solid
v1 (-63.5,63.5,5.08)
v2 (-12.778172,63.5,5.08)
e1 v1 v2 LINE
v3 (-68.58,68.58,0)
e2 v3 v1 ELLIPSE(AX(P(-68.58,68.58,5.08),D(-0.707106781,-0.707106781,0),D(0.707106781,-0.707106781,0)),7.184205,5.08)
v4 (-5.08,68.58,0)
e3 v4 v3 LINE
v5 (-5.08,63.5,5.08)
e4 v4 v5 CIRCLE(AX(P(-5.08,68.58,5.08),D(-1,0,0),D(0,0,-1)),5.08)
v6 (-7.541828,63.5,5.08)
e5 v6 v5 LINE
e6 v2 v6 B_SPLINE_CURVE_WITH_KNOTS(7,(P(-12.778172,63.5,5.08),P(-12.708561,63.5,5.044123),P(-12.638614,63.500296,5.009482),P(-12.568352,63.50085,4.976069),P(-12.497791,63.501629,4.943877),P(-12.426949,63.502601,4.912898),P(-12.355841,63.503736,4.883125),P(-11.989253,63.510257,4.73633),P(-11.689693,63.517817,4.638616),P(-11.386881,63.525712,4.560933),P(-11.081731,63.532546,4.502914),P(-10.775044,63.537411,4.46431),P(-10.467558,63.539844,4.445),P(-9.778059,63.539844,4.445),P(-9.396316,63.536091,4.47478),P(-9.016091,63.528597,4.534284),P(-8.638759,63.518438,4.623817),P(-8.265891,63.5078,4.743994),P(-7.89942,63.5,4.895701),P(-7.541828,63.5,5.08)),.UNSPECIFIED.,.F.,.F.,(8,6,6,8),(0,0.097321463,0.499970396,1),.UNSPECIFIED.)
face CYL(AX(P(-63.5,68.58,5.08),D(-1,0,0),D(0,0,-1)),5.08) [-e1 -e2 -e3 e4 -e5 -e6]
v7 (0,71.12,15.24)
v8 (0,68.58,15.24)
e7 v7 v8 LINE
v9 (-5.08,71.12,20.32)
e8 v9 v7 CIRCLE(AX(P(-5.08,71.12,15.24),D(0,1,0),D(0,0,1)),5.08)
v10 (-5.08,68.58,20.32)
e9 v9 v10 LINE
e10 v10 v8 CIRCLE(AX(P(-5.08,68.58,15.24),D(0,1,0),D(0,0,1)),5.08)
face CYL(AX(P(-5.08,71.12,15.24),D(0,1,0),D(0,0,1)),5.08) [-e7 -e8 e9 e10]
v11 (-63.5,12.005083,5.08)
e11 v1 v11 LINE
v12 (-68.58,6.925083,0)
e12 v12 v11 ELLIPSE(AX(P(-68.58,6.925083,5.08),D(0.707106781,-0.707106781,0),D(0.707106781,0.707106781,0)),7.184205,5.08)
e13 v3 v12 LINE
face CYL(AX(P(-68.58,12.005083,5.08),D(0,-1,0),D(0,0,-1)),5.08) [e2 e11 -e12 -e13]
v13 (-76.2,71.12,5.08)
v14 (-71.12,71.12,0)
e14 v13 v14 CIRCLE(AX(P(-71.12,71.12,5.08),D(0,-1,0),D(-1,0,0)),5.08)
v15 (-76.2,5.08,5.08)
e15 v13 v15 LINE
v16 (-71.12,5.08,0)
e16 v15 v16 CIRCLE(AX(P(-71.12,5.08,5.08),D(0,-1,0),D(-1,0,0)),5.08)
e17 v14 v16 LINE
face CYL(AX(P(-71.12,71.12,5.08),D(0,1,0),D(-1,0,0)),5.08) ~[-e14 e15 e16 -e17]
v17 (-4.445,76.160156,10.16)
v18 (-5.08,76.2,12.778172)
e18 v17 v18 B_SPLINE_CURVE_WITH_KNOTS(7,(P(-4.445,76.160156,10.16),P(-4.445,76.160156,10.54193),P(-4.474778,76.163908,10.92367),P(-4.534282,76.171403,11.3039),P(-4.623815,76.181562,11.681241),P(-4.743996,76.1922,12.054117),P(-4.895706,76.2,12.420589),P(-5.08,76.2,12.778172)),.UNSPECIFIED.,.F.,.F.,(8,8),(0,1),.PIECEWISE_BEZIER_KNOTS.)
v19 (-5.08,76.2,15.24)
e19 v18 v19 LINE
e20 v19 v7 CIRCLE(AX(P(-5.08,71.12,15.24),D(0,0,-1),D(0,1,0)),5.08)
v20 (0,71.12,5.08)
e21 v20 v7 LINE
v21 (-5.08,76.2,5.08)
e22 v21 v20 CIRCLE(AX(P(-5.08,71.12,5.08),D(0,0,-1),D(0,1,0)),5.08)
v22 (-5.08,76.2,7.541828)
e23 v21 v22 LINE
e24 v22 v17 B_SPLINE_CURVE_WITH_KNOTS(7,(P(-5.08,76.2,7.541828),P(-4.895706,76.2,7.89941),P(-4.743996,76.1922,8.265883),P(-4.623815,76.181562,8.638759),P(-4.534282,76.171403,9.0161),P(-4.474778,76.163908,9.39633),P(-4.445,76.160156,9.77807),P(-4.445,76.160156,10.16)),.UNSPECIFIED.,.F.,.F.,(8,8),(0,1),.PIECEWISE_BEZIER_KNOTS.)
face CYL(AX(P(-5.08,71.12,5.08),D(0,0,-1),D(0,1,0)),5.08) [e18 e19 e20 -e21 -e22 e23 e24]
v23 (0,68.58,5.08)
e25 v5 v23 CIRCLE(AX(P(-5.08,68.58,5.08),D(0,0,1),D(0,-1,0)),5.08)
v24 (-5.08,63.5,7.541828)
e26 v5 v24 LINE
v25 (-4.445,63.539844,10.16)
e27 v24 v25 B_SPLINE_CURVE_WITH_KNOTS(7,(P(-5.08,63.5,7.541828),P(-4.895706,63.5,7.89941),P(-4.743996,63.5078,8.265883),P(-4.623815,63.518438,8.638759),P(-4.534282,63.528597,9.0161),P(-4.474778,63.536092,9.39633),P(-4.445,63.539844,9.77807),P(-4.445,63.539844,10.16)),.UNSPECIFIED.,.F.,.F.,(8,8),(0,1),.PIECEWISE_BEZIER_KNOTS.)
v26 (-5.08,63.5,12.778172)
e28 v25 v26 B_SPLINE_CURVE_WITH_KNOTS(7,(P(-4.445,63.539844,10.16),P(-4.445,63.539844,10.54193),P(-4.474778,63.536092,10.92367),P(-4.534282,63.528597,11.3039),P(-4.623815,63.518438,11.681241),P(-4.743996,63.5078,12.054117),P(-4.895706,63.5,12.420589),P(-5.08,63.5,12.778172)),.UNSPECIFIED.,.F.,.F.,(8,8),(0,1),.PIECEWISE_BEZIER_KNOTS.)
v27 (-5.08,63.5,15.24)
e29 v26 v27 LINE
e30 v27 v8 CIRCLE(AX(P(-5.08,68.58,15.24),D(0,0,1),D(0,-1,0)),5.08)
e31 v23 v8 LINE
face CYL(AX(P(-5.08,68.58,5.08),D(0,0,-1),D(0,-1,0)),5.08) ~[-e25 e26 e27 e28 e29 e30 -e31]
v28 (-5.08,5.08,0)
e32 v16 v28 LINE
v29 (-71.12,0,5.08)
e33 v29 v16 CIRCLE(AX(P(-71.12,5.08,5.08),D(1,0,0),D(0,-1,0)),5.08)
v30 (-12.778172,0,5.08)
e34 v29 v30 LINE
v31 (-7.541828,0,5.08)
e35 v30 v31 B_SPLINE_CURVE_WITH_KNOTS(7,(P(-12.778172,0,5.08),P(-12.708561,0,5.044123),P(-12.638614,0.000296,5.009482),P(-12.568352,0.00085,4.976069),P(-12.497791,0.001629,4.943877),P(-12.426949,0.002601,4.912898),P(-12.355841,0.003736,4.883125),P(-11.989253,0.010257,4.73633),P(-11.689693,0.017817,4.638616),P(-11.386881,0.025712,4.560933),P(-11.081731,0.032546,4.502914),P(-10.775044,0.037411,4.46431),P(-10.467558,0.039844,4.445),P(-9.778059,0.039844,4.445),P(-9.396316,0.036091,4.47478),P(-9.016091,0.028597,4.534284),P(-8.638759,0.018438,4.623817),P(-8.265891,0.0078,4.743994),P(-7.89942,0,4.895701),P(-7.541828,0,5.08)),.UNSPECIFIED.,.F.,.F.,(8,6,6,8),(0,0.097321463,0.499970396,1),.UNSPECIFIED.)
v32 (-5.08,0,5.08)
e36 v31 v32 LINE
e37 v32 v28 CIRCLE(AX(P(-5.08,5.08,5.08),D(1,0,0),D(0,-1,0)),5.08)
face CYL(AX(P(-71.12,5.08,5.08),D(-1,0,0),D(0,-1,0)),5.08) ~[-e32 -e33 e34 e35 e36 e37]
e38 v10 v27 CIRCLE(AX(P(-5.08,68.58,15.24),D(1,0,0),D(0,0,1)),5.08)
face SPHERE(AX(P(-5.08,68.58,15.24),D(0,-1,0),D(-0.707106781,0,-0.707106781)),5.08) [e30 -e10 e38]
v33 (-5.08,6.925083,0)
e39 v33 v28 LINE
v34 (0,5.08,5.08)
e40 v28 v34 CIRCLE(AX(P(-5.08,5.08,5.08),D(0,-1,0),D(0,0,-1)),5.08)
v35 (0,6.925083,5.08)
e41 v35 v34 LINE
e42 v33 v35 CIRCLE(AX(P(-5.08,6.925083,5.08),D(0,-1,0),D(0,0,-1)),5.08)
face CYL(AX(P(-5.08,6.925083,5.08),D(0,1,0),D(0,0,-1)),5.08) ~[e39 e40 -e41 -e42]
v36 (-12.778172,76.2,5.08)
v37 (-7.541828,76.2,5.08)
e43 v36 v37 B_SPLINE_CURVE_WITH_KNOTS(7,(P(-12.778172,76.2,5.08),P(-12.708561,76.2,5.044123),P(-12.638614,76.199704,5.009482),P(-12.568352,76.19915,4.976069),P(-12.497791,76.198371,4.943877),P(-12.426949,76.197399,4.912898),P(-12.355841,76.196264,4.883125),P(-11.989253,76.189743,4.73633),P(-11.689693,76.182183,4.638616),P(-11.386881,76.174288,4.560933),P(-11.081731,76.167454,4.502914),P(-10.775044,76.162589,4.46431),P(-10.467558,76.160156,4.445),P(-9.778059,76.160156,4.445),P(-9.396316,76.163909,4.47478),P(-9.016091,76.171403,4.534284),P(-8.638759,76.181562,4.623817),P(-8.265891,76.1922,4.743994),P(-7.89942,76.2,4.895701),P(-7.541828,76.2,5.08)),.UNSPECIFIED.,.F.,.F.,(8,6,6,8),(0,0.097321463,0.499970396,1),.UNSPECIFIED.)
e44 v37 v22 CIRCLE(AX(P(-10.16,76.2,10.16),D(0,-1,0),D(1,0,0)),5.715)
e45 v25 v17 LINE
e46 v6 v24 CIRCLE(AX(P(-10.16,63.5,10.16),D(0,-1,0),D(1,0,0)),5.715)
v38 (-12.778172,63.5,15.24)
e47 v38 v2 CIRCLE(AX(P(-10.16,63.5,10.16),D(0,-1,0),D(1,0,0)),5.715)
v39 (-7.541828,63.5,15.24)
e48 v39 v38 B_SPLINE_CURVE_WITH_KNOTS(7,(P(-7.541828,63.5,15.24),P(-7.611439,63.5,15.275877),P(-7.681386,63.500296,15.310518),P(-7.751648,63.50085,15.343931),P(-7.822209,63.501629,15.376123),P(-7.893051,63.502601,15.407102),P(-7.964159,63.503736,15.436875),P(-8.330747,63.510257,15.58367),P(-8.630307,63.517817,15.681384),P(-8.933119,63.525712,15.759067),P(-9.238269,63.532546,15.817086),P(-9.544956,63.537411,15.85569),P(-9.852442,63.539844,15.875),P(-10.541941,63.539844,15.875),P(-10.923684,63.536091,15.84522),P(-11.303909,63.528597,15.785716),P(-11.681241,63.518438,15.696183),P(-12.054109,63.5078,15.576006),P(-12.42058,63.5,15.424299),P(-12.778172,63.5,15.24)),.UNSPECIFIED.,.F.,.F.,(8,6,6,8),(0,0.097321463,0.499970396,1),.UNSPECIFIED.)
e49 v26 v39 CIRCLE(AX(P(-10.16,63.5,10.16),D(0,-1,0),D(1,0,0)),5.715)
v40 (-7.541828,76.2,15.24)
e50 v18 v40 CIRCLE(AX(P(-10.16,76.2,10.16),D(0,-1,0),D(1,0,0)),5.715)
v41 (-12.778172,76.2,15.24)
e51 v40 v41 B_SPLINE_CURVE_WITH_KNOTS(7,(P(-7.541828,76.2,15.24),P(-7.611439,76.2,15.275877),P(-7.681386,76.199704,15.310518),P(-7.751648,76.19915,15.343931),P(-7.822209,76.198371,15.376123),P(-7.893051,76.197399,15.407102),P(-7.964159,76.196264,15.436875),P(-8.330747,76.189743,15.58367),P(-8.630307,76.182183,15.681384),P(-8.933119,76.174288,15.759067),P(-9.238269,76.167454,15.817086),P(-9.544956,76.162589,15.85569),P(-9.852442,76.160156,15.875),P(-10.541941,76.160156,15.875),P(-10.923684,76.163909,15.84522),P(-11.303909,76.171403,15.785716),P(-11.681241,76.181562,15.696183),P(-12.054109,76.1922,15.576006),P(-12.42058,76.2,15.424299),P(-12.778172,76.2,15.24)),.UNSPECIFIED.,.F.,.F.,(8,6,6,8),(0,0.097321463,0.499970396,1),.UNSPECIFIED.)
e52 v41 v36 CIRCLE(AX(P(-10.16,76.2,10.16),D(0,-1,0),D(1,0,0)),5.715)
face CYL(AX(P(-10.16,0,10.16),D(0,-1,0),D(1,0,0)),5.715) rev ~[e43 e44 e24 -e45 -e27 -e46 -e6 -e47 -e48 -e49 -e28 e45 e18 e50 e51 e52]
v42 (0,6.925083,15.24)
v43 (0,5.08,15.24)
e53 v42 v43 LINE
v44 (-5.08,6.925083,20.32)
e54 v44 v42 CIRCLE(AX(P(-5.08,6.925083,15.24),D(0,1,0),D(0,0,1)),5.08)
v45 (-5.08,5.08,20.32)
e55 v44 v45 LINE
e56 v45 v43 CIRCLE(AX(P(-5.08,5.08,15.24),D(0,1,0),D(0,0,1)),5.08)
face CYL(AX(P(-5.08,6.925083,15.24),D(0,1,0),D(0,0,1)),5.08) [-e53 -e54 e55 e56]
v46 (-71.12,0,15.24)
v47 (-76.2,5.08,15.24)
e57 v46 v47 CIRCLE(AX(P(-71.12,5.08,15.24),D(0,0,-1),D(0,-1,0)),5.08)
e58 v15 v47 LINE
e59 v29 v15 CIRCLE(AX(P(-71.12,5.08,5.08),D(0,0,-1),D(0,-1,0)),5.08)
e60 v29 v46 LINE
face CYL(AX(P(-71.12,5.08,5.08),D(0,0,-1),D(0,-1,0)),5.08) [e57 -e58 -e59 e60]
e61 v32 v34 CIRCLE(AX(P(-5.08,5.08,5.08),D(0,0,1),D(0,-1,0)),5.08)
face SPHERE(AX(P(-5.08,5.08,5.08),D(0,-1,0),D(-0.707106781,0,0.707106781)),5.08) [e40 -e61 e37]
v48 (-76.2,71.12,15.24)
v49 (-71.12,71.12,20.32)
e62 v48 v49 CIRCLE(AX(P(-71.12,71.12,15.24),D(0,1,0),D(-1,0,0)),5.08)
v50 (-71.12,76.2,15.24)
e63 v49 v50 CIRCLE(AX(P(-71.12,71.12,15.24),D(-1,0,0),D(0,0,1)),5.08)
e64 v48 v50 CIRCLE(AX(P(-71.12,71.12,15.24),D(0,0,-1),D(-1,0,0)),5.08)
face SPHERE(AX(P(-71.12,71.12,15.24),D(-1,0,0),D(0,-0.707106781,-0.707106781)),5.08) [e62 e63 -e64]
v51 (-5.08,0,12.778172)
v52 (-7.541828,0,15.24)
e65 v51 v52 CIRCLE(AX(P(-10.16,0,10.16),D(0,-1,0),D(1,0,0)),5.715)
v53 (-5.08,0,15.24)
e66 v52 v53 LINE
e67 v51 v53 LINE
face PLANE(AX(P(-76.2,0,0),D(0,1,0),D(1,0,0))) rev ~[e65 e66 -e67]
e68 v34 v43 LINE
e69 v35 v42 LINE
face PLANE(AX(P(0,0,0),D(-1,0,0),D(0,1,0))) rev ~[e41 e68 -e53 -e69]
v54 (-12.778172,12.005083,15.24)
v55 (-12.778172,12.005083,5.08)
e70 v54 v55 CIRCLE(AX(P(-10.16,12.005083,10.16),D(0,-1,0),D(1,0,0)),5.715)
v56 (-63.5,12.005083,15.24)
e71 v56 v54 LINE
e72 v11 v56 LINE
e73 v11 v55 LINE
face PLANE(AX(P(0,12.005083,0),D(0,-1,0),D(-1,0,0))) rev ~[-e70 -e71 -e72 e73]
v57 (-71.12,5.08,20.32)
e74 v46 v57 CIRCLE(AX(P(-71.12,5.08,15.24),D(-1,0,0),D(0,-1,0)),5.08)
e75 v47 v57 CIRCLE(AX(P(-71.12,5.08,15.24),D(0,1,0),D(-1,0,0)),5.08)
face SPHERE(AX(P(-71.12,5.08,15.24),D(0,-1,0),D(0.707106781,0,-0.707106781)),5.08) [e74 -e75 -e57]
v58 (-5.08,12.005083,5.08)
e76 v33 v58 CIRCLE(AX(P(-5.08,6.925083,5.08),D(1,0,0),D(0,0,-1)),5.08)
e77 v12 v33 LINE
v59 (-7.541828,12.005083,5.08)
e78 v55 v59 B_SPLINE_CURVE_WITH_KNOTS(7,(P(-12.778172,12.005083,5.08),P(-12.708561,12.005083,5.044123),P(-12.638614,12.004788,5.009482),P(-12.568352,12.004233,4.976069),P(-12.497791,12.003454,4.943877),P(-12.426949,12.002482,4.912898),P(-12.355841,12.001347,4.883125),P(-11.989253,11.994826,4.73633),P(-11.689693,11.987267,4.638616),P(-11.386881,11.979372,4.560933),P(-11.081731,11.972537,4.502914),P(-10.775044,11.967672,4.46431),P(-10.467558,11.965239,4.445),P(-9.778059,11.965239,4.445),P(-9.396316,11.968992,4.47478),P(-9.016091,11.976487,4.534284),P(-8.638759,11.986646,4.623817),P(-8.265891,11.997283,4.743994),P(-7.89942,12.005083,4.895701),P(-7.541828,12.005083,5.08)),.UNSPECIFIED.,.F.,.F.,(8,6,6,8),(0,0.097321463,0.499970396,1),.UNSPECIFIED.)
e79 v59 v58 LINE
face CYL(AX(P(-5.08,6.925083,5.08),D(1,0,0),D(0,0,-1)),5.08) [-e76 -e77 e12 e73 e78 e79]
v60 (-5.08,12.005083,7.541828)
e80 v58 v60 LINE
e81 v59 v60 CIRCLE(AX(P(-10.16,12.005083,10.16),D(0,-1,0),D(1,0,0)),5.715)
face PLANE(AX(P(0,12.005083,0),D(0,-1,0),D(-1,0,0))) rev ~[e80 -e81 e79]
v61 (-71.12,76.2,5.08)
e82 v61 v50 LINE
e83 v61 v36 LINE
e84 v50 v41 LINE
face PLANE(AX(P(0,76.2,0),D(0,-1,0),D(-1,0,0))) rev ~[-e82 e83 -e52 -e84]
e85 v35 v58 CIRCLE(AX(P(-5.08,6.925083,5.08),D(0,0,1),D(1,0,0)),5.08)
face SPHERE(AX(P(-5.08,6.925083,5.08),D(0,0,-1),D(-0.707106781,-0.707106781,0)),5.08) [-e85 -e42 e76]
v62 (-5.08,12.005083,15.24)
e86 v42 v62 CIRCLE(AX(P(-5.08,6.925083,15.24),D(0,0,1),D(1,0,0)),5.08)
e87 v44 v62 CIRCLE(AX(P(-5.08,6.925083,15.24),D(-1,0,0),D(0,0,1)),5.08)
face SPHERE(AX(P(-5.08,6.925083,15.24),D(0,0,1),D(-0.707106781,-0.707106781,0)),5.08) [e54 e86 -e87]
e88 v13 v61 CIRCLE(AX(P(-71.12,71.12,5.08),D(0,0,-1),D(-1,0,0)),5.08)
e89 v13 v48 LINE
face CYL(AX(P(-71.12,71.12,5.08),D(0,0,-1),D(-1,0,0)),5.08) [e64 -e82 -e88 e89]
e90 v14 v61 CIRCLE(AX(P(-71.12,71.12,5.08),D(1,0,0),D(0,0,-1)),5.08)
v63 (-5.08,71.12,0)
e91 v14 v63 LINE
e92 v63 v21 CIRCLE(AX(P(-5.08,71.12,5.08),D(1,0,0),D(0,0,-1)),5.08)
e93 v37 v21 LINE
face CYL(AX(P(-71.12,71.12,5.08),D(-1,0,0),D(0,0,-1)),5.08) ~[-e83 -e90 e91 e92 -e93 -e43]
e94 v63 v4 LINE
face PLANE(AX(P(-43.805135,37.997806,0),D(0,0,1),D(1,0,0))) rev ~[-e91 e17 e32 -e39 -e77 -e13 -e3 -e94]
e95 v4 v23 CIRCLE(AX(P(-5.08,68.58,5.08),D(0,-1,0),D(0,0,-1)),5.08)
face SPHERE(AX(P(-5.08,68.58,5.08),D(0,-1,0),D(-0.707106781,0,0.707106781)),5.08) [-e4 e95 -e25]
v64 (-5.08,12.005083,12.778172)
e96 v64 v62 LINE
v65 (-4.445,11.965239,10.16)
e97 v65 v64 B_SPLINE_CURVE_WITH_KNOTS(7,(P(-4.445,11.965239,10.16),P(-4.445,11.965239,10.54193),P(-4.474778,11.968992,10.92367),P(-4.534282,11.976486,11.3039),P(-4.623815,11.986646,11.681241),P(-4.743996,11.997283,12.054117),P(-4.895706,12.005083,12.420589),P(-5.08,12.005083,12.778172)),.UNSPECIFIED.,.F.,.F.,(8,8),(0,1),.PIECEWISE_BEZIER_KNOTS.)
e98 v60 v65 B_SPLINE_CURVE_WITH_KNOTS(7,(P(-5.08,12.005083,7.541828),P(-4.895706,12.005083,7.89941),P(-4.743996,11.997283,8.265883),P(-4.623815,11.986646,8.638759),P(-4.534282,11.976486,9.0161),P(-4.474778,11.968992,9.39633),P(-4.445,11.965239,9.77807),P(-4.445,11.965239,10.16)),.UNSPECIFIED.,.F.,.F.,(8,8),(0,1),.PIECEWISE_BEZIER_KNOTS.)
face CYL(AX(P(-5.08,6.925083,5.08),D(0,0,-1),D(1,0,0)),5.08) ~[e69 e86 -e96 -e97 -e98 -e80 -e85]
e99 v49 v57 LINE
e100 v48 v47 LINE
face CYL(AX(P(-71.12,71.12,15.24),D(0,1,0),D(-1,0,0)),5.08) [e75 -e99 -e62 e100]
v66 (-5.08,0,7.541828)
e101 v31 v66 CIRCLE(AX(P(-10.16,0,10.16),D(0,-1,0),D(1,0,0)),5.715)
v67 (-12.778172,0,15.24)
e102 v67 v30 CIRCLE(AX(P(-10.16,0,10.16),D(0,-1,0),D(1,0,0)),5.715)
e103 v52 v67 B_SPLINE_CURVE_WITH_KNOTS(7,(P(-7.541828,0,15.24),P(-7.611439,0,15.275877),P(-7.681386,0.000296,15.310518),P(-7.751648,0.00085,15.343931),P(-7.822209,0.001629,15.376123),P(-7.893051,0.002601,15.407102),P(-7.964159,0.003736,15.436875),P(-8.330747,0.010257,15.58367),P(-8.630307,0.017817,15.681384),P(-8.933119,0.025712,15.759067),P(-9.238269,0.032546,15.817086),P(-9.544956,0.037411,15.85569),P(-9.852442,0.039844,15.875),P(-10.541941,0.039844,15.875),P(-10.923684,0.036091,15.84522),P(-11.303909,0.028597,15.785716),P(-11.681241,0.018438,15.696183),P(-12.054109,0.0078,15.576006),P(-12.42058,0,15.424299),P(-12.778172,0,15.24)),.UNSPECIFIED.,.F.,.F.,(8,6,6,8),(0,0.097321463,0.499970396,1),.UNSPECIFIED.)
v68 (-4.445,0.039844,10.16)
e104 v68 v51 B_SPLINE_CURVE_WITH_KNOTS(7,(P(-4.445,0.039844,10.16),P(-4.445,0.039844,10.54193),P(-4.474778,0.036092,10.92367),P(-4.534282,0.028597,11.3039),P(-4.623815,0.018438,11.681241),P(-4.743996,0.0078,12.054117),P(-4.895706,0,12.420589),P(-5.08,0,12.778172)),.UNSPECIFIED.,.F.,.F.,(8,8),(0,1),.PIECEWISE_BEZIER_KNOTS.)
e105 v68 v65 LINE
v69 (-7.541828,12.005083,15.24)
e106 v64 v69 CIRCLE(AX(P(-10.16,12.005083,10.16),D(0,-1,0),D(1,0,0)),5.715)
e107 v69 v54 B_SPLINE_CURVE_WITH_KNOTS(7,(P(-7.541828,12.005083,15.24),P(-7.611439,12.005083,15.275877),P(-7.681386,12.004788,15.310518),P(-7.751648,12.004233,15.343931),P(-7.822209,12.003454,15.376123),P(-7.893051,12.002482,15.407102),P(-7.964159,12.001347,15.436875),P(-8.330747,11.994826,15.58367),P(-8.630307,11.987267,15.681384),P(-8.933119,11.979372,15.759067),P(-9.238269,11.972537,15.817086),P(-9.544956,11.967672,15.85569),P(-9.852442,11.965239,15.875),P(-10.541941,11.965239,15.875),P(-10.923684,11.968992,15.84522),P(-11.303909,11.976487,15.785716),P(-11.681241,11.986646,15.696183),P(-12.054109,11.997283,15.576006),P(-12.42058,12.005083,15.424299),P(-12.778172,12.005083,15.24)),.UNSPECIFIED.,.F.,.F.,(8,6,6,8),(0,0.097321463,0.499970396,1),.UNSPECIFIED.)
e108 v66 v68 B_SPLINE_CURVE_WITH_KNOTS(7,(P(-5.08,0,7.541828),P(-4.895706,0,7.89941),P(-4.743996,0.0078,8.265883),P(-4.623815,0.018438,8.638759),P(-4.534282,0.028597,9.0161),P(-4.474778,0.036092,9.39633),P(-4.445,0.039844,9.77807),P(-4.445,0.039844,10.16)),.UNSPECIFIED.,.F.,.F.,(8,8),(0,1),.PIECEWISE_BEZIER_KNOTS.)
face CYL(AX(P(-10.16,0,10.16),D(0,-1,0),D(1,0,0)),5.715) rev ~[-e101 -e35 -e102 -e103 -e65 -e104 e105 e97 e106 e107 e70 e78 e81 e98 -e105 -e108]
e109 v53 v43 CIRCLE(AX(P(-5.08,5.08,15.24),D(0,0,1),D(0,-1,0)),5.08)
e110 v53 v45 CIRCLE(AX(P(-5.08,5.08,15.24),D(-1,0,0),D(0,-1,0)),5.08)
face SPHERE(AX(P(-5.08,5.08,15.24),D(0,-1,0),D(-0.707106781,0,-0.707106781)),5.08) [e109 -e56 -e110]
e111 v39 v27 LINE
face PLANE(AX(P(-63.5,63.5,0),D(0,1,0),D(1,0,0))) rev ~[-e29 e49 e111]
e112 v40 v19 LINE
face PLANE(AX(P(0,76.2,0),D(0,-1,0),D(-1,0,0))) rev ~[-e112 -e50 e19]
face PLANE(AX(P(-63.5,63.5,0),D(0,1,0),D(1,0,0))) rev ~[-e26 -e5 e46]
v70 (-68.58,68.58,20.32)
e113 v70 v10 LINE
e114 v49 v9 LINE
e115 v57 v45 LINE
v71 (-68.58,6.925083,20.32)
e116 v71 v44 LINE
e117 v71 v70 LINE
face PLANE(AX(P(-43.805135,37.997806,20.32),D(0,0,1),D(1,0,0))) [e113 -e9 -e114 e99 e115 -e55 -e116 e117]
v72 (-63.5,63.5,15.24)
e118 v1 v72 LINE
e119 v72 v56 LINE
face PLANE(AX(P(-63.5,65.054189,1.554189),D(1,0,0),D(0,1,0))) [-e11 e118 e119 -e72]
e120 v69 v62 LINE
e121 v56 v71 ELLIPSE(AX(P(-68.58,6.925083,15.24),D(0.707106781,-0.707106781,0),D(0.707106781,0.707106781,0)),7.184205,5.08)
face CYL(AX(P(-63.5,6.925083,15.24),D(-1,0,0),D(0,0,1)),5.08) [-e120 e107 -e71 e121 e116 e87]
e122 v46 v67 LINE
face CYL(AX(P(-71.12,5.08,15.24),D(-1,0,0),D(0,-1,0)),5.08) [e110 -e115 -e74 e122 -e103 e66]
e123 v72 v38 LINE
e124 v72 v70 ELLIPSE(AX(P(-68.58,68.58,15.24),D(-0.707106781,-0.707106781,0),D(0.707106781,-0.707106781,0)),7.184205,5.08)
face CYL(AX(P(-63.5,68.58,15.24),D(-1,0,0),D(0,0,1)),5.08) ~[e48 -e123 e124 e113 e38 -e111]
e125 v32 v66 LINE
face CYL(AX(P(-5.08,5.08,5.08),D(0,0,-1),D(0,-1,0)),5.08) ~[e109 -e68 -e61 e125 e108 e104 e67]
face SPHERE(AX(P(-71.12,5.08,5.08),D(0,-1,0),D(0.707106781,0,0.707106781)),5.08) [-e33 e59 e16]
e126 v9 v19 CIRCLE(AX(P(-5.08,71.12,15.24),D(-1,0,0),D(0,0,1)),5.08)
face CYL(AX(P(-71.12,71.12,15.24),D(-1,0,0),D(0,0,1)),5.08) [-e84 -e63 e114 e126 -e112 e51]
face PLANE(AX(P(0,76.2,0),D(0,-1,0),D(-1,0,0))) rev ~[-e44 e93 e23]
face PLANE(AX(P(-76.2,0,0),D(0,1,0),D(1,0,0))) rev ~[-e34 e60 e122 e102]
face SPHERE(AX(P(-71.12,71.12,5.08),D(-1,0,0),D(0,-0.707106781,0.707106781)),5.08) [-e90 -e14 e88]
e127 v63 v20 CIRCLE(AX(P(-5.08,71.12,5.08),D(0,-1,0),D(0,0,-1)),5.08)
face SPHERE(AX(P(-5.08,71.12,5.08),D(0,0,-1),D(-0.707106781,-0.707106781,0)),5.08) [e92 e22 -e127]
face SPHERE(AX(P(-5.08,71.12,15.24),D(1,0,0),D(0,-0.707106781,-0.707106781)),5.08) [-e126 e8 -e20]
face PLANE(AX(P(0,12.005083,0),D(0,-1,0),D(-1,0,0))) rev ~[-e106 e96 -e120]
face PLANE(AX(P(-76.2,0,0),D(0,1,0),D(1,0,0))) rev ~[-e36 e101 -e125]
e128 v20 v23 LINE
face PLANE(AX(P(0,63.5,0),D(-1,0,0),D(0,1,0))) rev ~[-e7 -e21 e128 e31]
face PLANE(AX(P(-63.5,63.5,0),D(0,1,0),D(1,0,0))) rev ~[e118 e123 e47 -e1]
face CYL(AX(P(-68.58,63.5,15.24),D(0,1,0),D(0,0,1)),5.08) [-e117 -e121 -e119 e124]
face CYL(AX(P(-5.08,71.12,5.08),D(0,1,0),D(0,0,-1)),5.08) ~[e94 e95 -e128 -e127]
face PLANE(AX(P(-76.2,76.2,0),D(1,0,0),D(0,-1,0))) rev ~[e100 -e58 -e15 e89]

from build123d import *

# Parameters (mm, degrees)
F1_DEPTH      = 20.32
F2_R          = 5.715
F3_DEPTH      = 863.6
F4_T1_DEPTH   = 66.04
F4_T3_DEPTH   = 58.42
F4_T5_DEPTH   = 51.4949167535
F4_T7_DEPTH   = 66.04
F4_T9_DEPTH   = 10.16
F4_T11_DEPTH  = 2.54
F4_T13_DEPTH  = 1.8450832465
F4_S17_W      = 5.08
F4_S17_H      = 5.08
F4_T18_DEPTH  = 5.08
F4_S23_W      = 5.08
F4_S23_H      = 5.08
F4_T24_DEPTH  = 5.08
F4_S29_W      = 5.08
F4_S29_H      = 5.08
F4_T30_DEPTH  = 5.08
F4_S35_W      = 5.08
F4_S35_H      = 5.08
F4_T36_DEPTH  = 5.08
F4_S41_W      = 5.08
F4_S41_H      = 5.08
F4_T42_DEPTH  = 5.08
F4_S47_W      = 5.08
F4_S47_H      = 5.08
F4_T48_DEPTH  = 5.08
F4_S53_W      = 5.08
F4_S53_H      = 5.08
F4_T54_DEPTH  = 5.08
F4_S59_W      = 5.08
F4_S59_H      = 5.08
F4_T60_DEPTH  = 5.08
F4_S65_W      = 5.08
F4_S65_H      = 5.08
F4_T66_DEPTH  = 5.08
F4_S71_W      = 5.08
F4_S71_H      = 5.08
F4_T72_DEPTH  = 5.08
F4_S77_W      = 5.08
F4_S77_H      = 5.08
F4_T78_DEPTH  = 5.08
F4_S83_W      = 5.08
F4_S83_H      = 5.08
F4_T84_DEPTH  = 5.08
F4_T91_DEPTH  = 64.1949167535
F4_T95_DEPTH  = 71.12
F4_T102_DEPTH = 64.1949167535
F4_T106_DEPTH = 71.12
F4_T113_DEPTH = 71.12
F4_T117_DEPTH = 64.1949167535
F4_T124_DEPTH = 71.12
F4_T128_DEPTH = 64.1949167535


# Not quite as in the source:
# - a fillet or chamfer that OpenCascade refuses, or shapes differently, is made with other operations: its cross-section is extruded or revolved along the edge and cut away or added


with BuildPart() as f1:
    # F0 (on Top) → F1 (new body)
    with BuildSketch(Plane.XY):
        Polygon((-76.2, 0), (0, 0), (0, 12.0050832465), (-63.5, 12.0050832465), (-63.5, 63.5), (0, 63.5), (0, 76.2), (-76.2, 76.2), align=None)
    extrude(amount=F1_DEPTH)

    # F2 (on face) → F3 (cut)
    with BuildSketch(Plane.XZ):
        with Locations((-10.16, 10.16)):
            Circle(F2_R)
    extrude(amount=-F3_DEPTH, mode=Mode.SUBTRACT)

    # F4: fillet of radius 5.08 on 22 edges, made by hand

    # F4_s2 → F4_t1 (cut)
    with BuildSketch(Plane.YZ.offset(-71.12)):
        with BuildLine():
            ThreePointArc((71.12, 0), (74.7121024484, 1.4878975516), (76.2, 5.08))
            Line((76.2, 5.08), (76.2, 0))
            Line((76.2, 0), (71.12, 0))
        make_face()
        with BuildLine():
            ThreePointArc((71.12, 20.32), (74.7121024484, 18.8321024484), (76.2, 15.24))
            Line((76.2, 15.24), (76.2, 20.32))
            Line((76.2, 20.32), (71.12, 20.32))
        make_face()
        with BuildLine():
            ThreePointArc((0, 5.08), (1.4878975516, 1.4878975516), (5.08, 0))
            Line((5.08, 0), (0, 0))
            Line((0, 0), (0, 5.08))
        make_face()
        with BuildLine():
            ThreePointArc((0, 15.24), (1.4878975516, 18.8321024484), (5.08, 20.32))
            Line((5.08, 20.32), (0, 20.32))
            Line((0, 20.32), (0, 15.24))
        make_face()
    extrude(amount=F4_T1_DEPTH, mode=Mode.SUBTRACT)

    # F4_s4 → F4_t3 (cut)
    with BuildSketch(Plane.YZ.offset(-63.5)):
        with BuildLine():
            ThreePointArc((68.58, 0), (64.9878975516, 1.4878975516), (63.5, 5.08))
            Line((63.5, 5.08), (63.5, 0))
            Line((63.5, 0), (68.58, 0))
        make_face()
        with BuildLine():
            ThreePointArc((68.58, 20.32), (64.9878975516, 18.8321024484), (63.5, 15.24))
            Line((63.5, 15.24), (63.5, 20.32))
            Line((63.5, 20.32), (68.58, 20.32))
        make_face()
        with BuildLine():
            ThreePointArc((6.9250832465, 0), (10.5171856949, 1.4878975516), (12.0050832465, 5.08))
            Line((12.0050832465, 5.08), (12.0050832465, 0))
            Line((12.0050832465, 0), (6.9250832465, 0))
        make_face()
        with BuildLine():
            ThreePointArc((6.9250832465, 20.32), (10.5171856949, 18.8321024484), (12.0050832465, 15.24))
            Line((12.0050832465, 15.24), (12.0050832465, 20.32))
            Line((12.0050832465, 20.32), (6.9250832465, 20.32))
        make_face()
    extrude(amount=F4_T3_DEPTH, mode=Mode.SUBTRACT)

    # F4_s6 → F4_t5 (cut)
    with BuildSketch(Plane.XZ.offset(-63.5)):
        with BuildLine():
            ThreePointArc((-68.58, 20.32), (-64.9878975516, 18.8321024484), (-63.5, 15.24))
            Line((-63.5, 15.24), (-63.5, 20.32))
            Line((-63.5, 20.32), (-68.58, 20.32))
        make_face()
        with BuildLine():
            ThreePointArc((-68.58, 0), (-64.9878975516, 1.4878975516), (-63.5, 5.08))
            Line((-63.5, 5.08), (-63.5, 0))
            Line((-63.5, 0), (-68.58, 0))
        make_face()
    extrude(amount=F4_T5_DEPTH, mode=Mode.SUBTRACT)

    # F4_s8 → F4_t7 (cut)
    with BuildSketch(Plane.XZ.offset(-71.12)):
        with BuildLine():
            ThreePointArc((-76.2, 15.24), (-74.7121024484, 18.8321024484), (-71.12, 20.32))
            Line((-71.12, 20.32), (-76.2, 20.32))
            Line((-76.2, 20.32), (-76.2, 15.24))
        make_face()
        with BuildLine():
            ThreePointArc((-76.2, 5.08), (-74.7121024484, 1.4878975516), (-71.12, 0))
            Line((-71.12, 0), (-76.2, 0))
            Line((-76.2, 0), (-76.2, 5.08))
        make_face()
    extrude(amount=F4_T7_DEPTH, mode=Mode.SUBTRACT)

    # F4_s10 → F4_t9 (cut)
    with BuildSketch(Plane.XY.offset(5.08)):
        with BuildLine():
            ThreePointArc((-76.2, 71.12), (-74.7121024484, 74.7121024484), (-71.12, 76.2))
            Line((-71.12, 76.2), (-76.2, 76.2))
            Line((-76.2, 76.2), (-76.2, 71.12))
        make_face()
        with BuildLine():
            ThreePointArc((-71.12, 0), (-74.7121024484, 1.4878975516), (-76.2, 5.08))
            Line((-76.2, 5.08), (-76.2, 0))
            Line((-76.2, 0), (-71.12, 0))
        make_face()
        with BuildLine():
            ThreePointArc((-5.08, 63.5), (-1.4878975516, 64.9878975516), (0, 68.58))
            Line((0, 68.58), (0, 63.5))
            Line((0, 63.5), (-5.08, 63.5))
        make_face()
        with BuildLine():
            ThreePointArc((-5.08, 76.2), (-1.4878975516, 74.7121024484), (0, 71.12))
            Line((0, 71.12), (0, 76.2))
            Line((0, 76.2), (-5.08, 76.2))
        make_face()
        with BuildLine():
            ThreePointArc((-5.08, 0), (-1.4878975516, 1.4878975516), (0, 5.08))
            Line((0, 5.08), (0, 0))
            Line((0, 0), (-5.08, 0))
        make_face()
        with BuildLine():
            ThreePointArc((0, 6.9250832465), (-1.4878975516, 10.5171856949), (-5.08, 12.0050832465))
            Line((-5.08, 12.0050832465), (0, 12.0050832465))
            Line((0, 12.0050832465), (0, 6.9250832465))
        make_face()
    extrude(amount=F4_T9_DEPTH, mode=Mode.SUBTRACT)

    # F4_s12 → F4_t11 (cut)
    with BuildSketch(Plane.XZ.offset(-71.12)):
        with BuildLine():
            ThreePointArc((-5.08, 0), (-1.4878975516, 1.4878975516), (0, 5.08))
            Line((0, 5.08), (0, 0))
            Line((0, 0), (-5.08, 0))
        make_face()
        with BuildLine():
            ThreePointArc((-5.08, 20.32), (-1.4878975516, 18.8321024484), (0, 15.24))
            Line((0, 15.24), (0, 20.32))
            Line((0, 20.32), (-5.08, 20.32))
        make_face()
    extrude(amount=F4_T11_DEPTH, mode=Mode.SUBTRACT)

    # F4_s14 → F4_t13 (cut)
    with BuildSketch(Plane.XZ.offset(-6.9250832465)):
        with BuildLine():
            ThreePointArc((-5.08, 0), (-1.4878975516, 1.4878975516), (0, 5.08))
            Line((0, 5.08), (0, 0))
            Line((0, 0), (-5.08, 0))
        make_face()
        with BuildLine():
            ThreePointArc((-5.08, 20.32), (-1.4878975516, 18.8321024484), (0, 15.24))
            Line((0, 15.24), (0, 20.32))
            Line((0, 20.32), (-5.08, 20.32))
        make_face()
    extrude(amount=F4_T13_DEPTH, mode=Mode.SUBTRACT)


with BuildPart() as f4_tool16:
    # F4_s17 → F4_t18 (new body)
    with BuildSketch(Plane.XY.offset(5.08)):
        with Locations((-2.54, 73.66)):
            Rectangle(F4_S17_W, F4_S17_H)
    extrude(amount=-F4_T18_DEPTH)

    # F4_s19 → F4_t20 (revolve, cut)
    with BuildSketch(Plane(origin=(-5.08, 71.12, 5.08), x_dir=(-0.7071067812, -0.7071067812, 0), z_dir=(0.7071067812, -0.7071067812, 0))):
        with BuildLine():
            ThreePointArc((0, -5.08), (5.08, 0), (0, 5.08))
            Line((0, 5.08), (0, -5.08))
        make_face()
    revolve(axis=Axis((-5.08, 71.12, 5.08), (0, 0, -1)), mode=Mode.SUBTRACT)


with BuildPart() as f1_1:
    add(f1.part)

    # F4_t15: cut F4_tool16
    add(f4_tool16.part, mode=Mode.SUBTRACT)


with BuildPart() as f4_tool22:
    # F4_s23 → F4_t24 (new body)
    with BuildSketch(Plane.YZ.offset(-71.12)):
        with Locations((73.66, 2.54)):
            Rectangle(F4_S23_W, F4_S23_H)
    extrude(amount=-F4_T24_DEPTH)

    # F4_s25 → F4_t26 (revolve, cut)
    with BuildSketch(Plane(origin=(-71.12, 71.12, 5.08), x_dir=(0, -0.7071067812, 0.7071067812), z_dir=(0, -0.7071067812, -0.7071067812))):
        with BuildLine():
            ThreePointArc((0, -5.08), (5.08, 0), (0, 5.08))
            Line((0, 5.08), (0, -5.08))
        make_face()
    revolve(axis=Axis((-71.12, 71.12, 5.08), (-1, 0, 0)), mode=Mode.SUBTRACT)


with BuildPart() as f1_2:
    add(f1_1.part)

    # F4_t21: cut F4_tool22
    add(f4_tool22.part, mode=Mode.SUBTRACT)


with BuildPart() as f4_tool28:
    # F4_s29 → F4_t30 (new body)
    with BuildSketch(Plane.XZ.offset(-68.58)):
        with Locations((-2.54, 2.54)):
            Rectangle(F4_S29_W, F4_S29_H)
    extrude(amount=F4_T30_DEPTH)

    # F4_s31 → F4_t32 (revolve, cut)
    with BuildSketch(Plane(origin=(-5.08, 68.58, 5.08), x_dir=(-0.7071067812, 0, 0.7071067812), z_dir=(0.7071067812, 0, 0.7071067812))):
        with BuildLine():
            ThreePointArc((0, -5.08), (5.08, 0), (0, 5.08))
            Line((0, 5.08), (0, -5.08))
        make_face()
    revolve(axis=Axis((-5.08, 68.58, 5.08), (0, -1, 0)), mode=Mode.SUBTRACT)


with BuildPart() as f1_3:
    add(f1_2.part)

    # F4_t27: cut F4_tool28
    add(f4_tool28.part, mode=Mode.SUBTRACT)


with BuildPart() as f4_tool34:
    # F4_s35 → F4_t36 (new body)
    with BuildSketch(Plane.XZ.offset(-68.58)):
        with Locations((-2.54, 17.78)):
            Rectangle(F4_S35_W, F4_S35_H)
    extrude(amount=F4_T36_DEPTH)

    # F4_s37 → F4_t38 (revolve, cut)
    with BuildSketch(Plane(origin=(-5.08, 68.58, 15.24), x_dir=(-0.7071067812, 0, -0.7071067812), z_dir=(-0.7071067812, 0, 0.7071067812))):
        with BuildLine():
            ThreePointArc((0, -5.08), (5.08, 0), (0, 5.08))
            Line((0, 5.08), (0, -5.08))
        make_face()
    revolve(axis=Axis((-5.08, 68.58, 15.24), (0, -1, 0)), mode=Mode.SUBTRACT)


with BuildPart() as f1_4:
    add(f1_3.part)

    # F4_t33: cut F4_tool34
    add(f4_tool34.part, mode=Mode.SUBTRACT)


with BuildPart() as f4_tool40:
    # F4_s41 → F4_t42 (new body)
    with BuildSketch(Plane.YZ.offset(-5.08)):
        with Locations((73.66, 17.78)):
            Rectangle(F4_S41_W, F4_S41_H)
    extrude(amount=F4_T42_DEPTH)

    # F4_s43 → F4_t44 (revolve, cut)
    with BuildSketch(Plane(origin=(-5.08, 71.12, 15.24), x_dir=(0, -0.7071067812, -0.7071067812), z_dir=(0, -0.7071067812, 0.7071067812))):
        with BuildLine():
            ThreePointArc((0, -5.08), (5.08, 0), (0, 5.08))
            Line((0, 5.08), (0, -5.08))
        make_face()
    revolve(axis=Axis((-5.08, 71.12, 15.24), (1, 0, 0)), mode=Mode.SUBTRACT)


with BuildPart() as f1_5:
    add(f1_4.part)

    # F4_t39: cut F4_tool40
    add(f4_tool40.part, mode=Mode.SUBTRACT)


with BuildPart() as f4_tool46:
    # F4_s47 → F4_t48 (new body)
    with BuildSketch(Plane.YZ.offset(-71.12)):
        with Locations((73.66, 17.78)):
            Rectangle(F4_S47_W, F4_S47_H)
    extrude(amount=-F4_T48_DEPTH)

    # F4_s49 → F4_t50 (revolve, cut)
    with BuildSketch(Plane(origin=(-71.12, 71.12, 15.24), x_dir=(0, -0.7071067812, -0.7071067812), z_dir=(0, 0.7071067812, -0.7071067812))):
        with BuildLine():
            ThreePointArc((0, -5.08), (5.08, 0), (0, 5.08))
            Line((0, 5.08), (0, -5.08))
        make_face()
    revolve(axis=Axis((-71.12, 71.12, 15.24), (-1, 0, 0)), mode=Mode.SUBTRACT)


with BuildPart() as f1_6:
    add(f1_5.part)

    # F4_t45: cut F4_tool46
    add(f4_tool46.part, mode=Mode.SUBTRACT)


with BuildPart() as f4_tool52:
    # F4_s53 → F4_t54 (new body)
    with BuildSketch(Plane.XZ.offset(-5.08)):
        with Locations((-73.66, 17.78)):
            Rectangle(F4_S53_W, F4_S53_H)
    extrude(amount=F4_T54_DEPTH)

    # F4_s55 → F4_t56 (revolve, cut)
    with BuildSketch(Plane(origin=(-71.12, 5.08, 15.24), x_dir=(0.7071067812, 0, -0.7071067812), z_dir=(-0.7071067812, 0, -0.7071067812))):
        with BuildLine():
            ThreePointArc((0, -5.08), (5.08, 0), (0, 5.08))
            Line((0, 5.08), (0, -5.08))
        make_face()
    revolve(axis=Axis((-71.12, 5.08, 15.24), (0, -1, 0)), mode=Mode.SUBTRACT)


with BuildPart() as f1_7:
    add(f1_6.part)

    # F4_t51: cut F4_tool52
    add(f4_tool52.part, mode=Mode.SUBTRACT)


with BuildPart() as f4_tool58:
    # F4_s59 → F4_t60 (new body)
    with BuildSketch(Plane.XZ.offset(-5.08)):
        with Locations((-73.66, 2.54)):
            Rectangle(F4_S59_W, F4_S59_H)
    extrude(amount=F4_T60_DEPTH)

    # F4_s61 → F4_t62 (revolve, cut)
    with BuildSketch(Plane(origin=(-71.12, 5.08, 5.08), x_dir=(0.7071067812, 0, 0.7071067812), z_dir=(0.7071067812, 0, -0.7071067812))):
        with BuildLine():
            ThreePointArc((0, -5.08), (5.08, 0), (0, 5.08))
            Line((0, 5.08), (0, -5.08))
        make_face()
    revolve(axis=Axis((-71.12, 5.08, 5.08), (0, -1, 0)), mode=Mode.SUBTRACT)


with BuildPart() as f1_8:
    add(f1_7.part)

    # F4_t57: cut F4_tool58
    add(f4_tool58.part, mode=Mode.SUBTRACT)


with BuildPart() as f4_tool64:
    # F4_s65 → F4_t66 (new body)
    with BuildSketch(Plane.XZ.offset(-5.08)):
        with Locations((-2.54, 2.54)):
            Rectangle(F4_S65_W, F4_S65_H)
    extrude(amount=F4_T66_DEPTH)

    # F4_s67 → F4_t68 (revolve, cut)
    with BuildSketch(Plane(origin=(-5.08, 5.08, 5.08), x_dir=(-0.7071067812, 0, 0.7071067812), z_dir=(0.7071067812, 0, 0.7071067812))):
        with BuildLine():
            ThreePointArc((0, -5.08), (5.08, 0), (0, 5.08))
            Line((0, 5.08), (0, -5.08))
        make_face()
    revolve(axis=Axis((-5.08, 5.08, 5.08), (0, -1, 0)), mode=Mode.SUBTRACT)


with BuildPart() as f1_9:
    add(f1_8.part)

    # F4_t63: cut F4_tool64
    add(f4_tool64.part, mode=Mode.SUBTRACT)


with BuildPart() as f4_tool70:
    # F4_s71 → F4_t72 (new body)
    with BuildSketch(Plane.XZ.offset(-5.08)):
        with Locations((-2.54, 17.78)):
            Rectangle(F4_S71_W, F4_S71_H)
    extrude(amount=F4_T72_DEPTH)

    # F4_s73 → F4_t74 (revolve, cut)
    with BuildSketch(Plane(origin=(-5.08, 5.08, 15.24), x_dir=(-0.7071067812, 0, -0.7071067812), z_dir=(-0.7071067812, 0, 0.7071067812))):
        with BuildLine():
            ThreePointArc((0, -5.08), (5.08, 0), (0, 5.08))
            Line((0, 5.08), (0, -5.08))
        make_face()
    revolve(axis=Axis((-5.08, 5.08, 15.24), (0, -1, 0)), mode=Mode.SUBTRACT)


with BuildPart() as f1_10:
    add(f1_9.part)

    # F4_t69: cut F4_tool70
    add(f4_tool70.part, mode=Mode.SUBTRACT)


with BuildPart() as f4_tool76:
    # F4_s77 → F4_t78 (new body)
    with BuildSketch(Plane.XY.offset(5.08)):
        with Locations((-2.54, 9.4650832465)):
            Rectangle(F4_S77_W, F4_S77_H)
    extrude(amount=-F4_T78_DEPTH)

    # F4_s79 → F4_t80 (revolve, cut)
    with BuildSketch(Plane(origin=(-5.08, 6.9250832465, 5.08), x_dir=(-0.7071067812, -0.7071067812, 0), z_dir=(0.7071067812, -0.7071067812, 0))):
        with BuildLine():
            ThreePointArc((0, -5.08), (5.08, 0), (0, 5.08))
            Line((0, 5.08), (0, -5.08))
        make_face()
    revolve(axis=Axis((-5.08, 6.9250832465, 5.08), (0, 0, -1)), mode=Mode.SUBTRACT)


with BuildPart() as f1_11:
    add(f1_10.part)

    # F4_t75: cut F4_tool76
    add(f4_tool76.part, mode=Mode.SUBTRACT)


with BuildPart() as f4_tool82:
    # F4_s83 → F4_t84 (new body)
    with BuildSketch(Plane.XY.offset(15.24)):
        with Locations((-2.54, 9.4650832465)):
            Rectangle(F4_S83_W, F4_S83_H)
    extrude(amount=F4_T84_DEPTH)

    # F4_s85 → F4_t86 (revolve, cut)
    with BuildSketch(Plane(origin=(-5.08, 6.9250832465, 15.24), x_dir=(-0.7071067812, -0.7071067812, 0), z_dir=(-0.7071067812, 0.7071067812, 0))):
        with BuildLine():
            ThreePointArc((0, -5.08), (5.08, 0), (0, 5.08))
            Line((0, 5.08), (0, -5.08))
        make_face()
    revolve(axis=Axis((-5.08, 6.9250832465, 15.24), (0, 0, 1)), mode=Mode.SUBTRACT)


with BuildPart() as f1_12:
    add(f1_11.part)

    # F4_t81: cut F4_tool82
    add(f4_tool82.part, mode=Mode.SUBTRACT)


with BuildPart() as f4_tool89:
    # F4_s90 → F4_t91 (new body)
    with BuildSketch(Plane.XZ.offset(-12.0050832465)):
        with BuildLine():
            ThreePointArc((-68.58, 0), (-64.9878975516, 1.4878975516), (-63.5, 5.08))
            Line((-63.5, 5.08), (-63.5, 0))
            Line((-63.5, 0), (-68.58, 0))
        make_face()
    extrude(amount=-F4_T91_DEPTH)

    split(bisect_by=Plane.XZ.offset(-63.5), keep=Keep.BOTTOM)


with BuildPart() as f4_tool93:
    # F4_s94 → F4_t95 (new body)
    with BuildSketch(Plane.YZ.offset(-76.2)):
        with BuildLine():
            ThreePointArc((68.58, 0), (64.9878975516, 1.4878975516), (63.5, 5.08))
            Line((63.5, 5.08), (63.5, 0))
            Line((63.5, 0), (68.58, 0))
        make_face()
    extrude(amount=F4_T95_DEPTH)

    split(bisect_by=Plane.YZ.offset(-63.5), keep=Keep.BOTTOM)


with BuildPart() as f4_tool89_1:
    add(f4_tool89.part)

    # F4_t97: intersect F4_tool93
    add(f4_tool93.part, mode=Mode.INTERSECT)


with BuildPart() as f1_13:
    add(f1_12.part)

    # F4_t87: cut F4_tool89
    add(f4_tool89_1.part, mode=Mode.SUBTRACT)


with BuildPart() as f4_tool100:
    # F4_s101 → F4_t102 (new body)
    with BuildSketch(Plane.XZ.offset(-12.0050832465)):
        with BuildLine():
            ThreePointArc((-68.58, 20.32), (-64.9878975516, 18.8321024484), (-63.5, 15.24))
            Line((-63.5, 15.24), (-63.5, 20.32))
            Line((-63.5, 20.32), (-68.58, 20.32))
        make_face()
    extrude(amount=-F4_T102_DEPTH)

    split(bisect_by=Plane.XZ.offset(-63.5), keep=Keep.BOTTOM)


with BuildPart() as f4_tool104:
    # F4_s105 → F4_t106 (new body)
    with BuildSketch(Plane.YZ.offset(-76.2)):
        with BuildLine():
            ThreePointArc((68.58, 20.32), (64.9878975516, 18.8321024484), (63.5, 15.24))
            Line((63.5, 15.24), (63.5, 20.32))
            Line((63.5, 20.32), (68.58, 20.32))
        make_face()
    extrude(amount=F4_T106_DEPTH)

    split(bisect_by=Plane.YZ.offset(-63.5), keep=Keep.BOTTOM)


with BuildPart() as f4_tool100_1:
    add(f4_tool100.part)

    # F4_t108: intersect F4_tool104
    add(f4_tool104.part, mode=Mode.INTERSECT)


with BuildPart() as f1_14:
    add(f1_13.part)

    # F4_t98: cut F4_tool100
    add(f4_tool100_1.part, mode=Mode.SUBTRACT)


with BuildPart() as f4_tool111:
    # F4_s112 → F4_t113 (new body)
    with BuildSketch(Plane.YZ.offset(-5.08)):
        with BuildLine():
            ThreePointArc((6.9250832465, 20.32), (10.5171856949, 18.8321024484), (12.0050832465, 15.24))
            Line((12.0050832465, 15.24), (12.0050832465, 20.32))
            Line((12.0050832465, 20.32), (6.9250832465, 20.32))
        make_face()
    extrude(amount=-F4_T113_DEPTH)

    split(bisect_by=Plane.YZ.offset(-63.5), keep=Keep.BOTTOM)


with BuildPart() as f4_tool115:
    # F4_s116 → F4_t117 (new body)
    with BuildSketch(Plane.XZ.offset(0.6949167535)):
        with BuildLine():
            ThreePointArc((-68.58, 20.32), (-64.9878975516, 18.8321024484), (-63.5, 15.24))
            Line((-63.5, 15.24), (-63.5, 20.32))
            Line((-63.5, 20.32), (-68.58, 20.32))
        make_face()
    extrude(amount=-F4_T117_DEPTH)

    split(bisect_by=Plane.XZ.offset(-12.0050832465), keep=Keep.TOP)


with BuildPart() as f4_tool111_1:
    add(f4_tool111.part)

    # F4_t119: intersect F4_tool115
    add(f4_tool115.part, mode=Mode.INTERSECT)


with BuildPart() as f1_15:
    add(f1_14.part)

    # F4_t109: cut F4_tool111
    add(f4_tool111_1.part, mode=Mode.SUBTRACT)


with BuildPart() as f4_tool122:
    # F4_s123 → F4_t124 (new body)
    with BuildSketch(Plane.YZ.offset(-5.08)):
        with BuildLine():
            ThreePointArc((6.9250832465, 0), (10.5171856949, 1.4878975516), (12.0050832465, 5.08))
            Line((12.0050832465, 5.08), (12.0050832465, 0))
            Line((12.0050832465, 0), (6.9250832465, 0))
        make_face()
    extrude(amount=-F4_T124_DEPTH)

    split(bisect_by=Plane.YZ.offset(-63.5), keep=Keep.BOTTOM)


with BuildPart() as f4_tool126:
    # F4_s127 → F4_t128 (new body)
    with BuildSketch(Plane.XZ.offset(0.6949167535)):
        with BuildLine():
            ThreePointArc((-68.58, 0), (-64.9878975516, 1.4878975516), (-63.5, 5.08))
            Line((-63.5, 5.08), (-63.5, 0))
            Line((-63.5, 0), (-68.58, 0))
        make_face()
    extrude(amount=-F4_T128_DEPTH)

    split(bisect_by=Plane.XZ.offset(-12.0050832465), keep=Keep.TOP)


with BuildPart() as f4_tool122_1:
    add(f4_tool122.part)

    # F4_t130: intersect F4_tool126
    add(f4_tool126.part, mode=Mode.INTERSECT)


with BuildPart() as f1_16:
    add(f1_15.part)

    # F4_t120: cut F4_tool122
    add(f4_tool122_1.part, mode=Mode.SUBTRACT)


solid = f1_16.part
